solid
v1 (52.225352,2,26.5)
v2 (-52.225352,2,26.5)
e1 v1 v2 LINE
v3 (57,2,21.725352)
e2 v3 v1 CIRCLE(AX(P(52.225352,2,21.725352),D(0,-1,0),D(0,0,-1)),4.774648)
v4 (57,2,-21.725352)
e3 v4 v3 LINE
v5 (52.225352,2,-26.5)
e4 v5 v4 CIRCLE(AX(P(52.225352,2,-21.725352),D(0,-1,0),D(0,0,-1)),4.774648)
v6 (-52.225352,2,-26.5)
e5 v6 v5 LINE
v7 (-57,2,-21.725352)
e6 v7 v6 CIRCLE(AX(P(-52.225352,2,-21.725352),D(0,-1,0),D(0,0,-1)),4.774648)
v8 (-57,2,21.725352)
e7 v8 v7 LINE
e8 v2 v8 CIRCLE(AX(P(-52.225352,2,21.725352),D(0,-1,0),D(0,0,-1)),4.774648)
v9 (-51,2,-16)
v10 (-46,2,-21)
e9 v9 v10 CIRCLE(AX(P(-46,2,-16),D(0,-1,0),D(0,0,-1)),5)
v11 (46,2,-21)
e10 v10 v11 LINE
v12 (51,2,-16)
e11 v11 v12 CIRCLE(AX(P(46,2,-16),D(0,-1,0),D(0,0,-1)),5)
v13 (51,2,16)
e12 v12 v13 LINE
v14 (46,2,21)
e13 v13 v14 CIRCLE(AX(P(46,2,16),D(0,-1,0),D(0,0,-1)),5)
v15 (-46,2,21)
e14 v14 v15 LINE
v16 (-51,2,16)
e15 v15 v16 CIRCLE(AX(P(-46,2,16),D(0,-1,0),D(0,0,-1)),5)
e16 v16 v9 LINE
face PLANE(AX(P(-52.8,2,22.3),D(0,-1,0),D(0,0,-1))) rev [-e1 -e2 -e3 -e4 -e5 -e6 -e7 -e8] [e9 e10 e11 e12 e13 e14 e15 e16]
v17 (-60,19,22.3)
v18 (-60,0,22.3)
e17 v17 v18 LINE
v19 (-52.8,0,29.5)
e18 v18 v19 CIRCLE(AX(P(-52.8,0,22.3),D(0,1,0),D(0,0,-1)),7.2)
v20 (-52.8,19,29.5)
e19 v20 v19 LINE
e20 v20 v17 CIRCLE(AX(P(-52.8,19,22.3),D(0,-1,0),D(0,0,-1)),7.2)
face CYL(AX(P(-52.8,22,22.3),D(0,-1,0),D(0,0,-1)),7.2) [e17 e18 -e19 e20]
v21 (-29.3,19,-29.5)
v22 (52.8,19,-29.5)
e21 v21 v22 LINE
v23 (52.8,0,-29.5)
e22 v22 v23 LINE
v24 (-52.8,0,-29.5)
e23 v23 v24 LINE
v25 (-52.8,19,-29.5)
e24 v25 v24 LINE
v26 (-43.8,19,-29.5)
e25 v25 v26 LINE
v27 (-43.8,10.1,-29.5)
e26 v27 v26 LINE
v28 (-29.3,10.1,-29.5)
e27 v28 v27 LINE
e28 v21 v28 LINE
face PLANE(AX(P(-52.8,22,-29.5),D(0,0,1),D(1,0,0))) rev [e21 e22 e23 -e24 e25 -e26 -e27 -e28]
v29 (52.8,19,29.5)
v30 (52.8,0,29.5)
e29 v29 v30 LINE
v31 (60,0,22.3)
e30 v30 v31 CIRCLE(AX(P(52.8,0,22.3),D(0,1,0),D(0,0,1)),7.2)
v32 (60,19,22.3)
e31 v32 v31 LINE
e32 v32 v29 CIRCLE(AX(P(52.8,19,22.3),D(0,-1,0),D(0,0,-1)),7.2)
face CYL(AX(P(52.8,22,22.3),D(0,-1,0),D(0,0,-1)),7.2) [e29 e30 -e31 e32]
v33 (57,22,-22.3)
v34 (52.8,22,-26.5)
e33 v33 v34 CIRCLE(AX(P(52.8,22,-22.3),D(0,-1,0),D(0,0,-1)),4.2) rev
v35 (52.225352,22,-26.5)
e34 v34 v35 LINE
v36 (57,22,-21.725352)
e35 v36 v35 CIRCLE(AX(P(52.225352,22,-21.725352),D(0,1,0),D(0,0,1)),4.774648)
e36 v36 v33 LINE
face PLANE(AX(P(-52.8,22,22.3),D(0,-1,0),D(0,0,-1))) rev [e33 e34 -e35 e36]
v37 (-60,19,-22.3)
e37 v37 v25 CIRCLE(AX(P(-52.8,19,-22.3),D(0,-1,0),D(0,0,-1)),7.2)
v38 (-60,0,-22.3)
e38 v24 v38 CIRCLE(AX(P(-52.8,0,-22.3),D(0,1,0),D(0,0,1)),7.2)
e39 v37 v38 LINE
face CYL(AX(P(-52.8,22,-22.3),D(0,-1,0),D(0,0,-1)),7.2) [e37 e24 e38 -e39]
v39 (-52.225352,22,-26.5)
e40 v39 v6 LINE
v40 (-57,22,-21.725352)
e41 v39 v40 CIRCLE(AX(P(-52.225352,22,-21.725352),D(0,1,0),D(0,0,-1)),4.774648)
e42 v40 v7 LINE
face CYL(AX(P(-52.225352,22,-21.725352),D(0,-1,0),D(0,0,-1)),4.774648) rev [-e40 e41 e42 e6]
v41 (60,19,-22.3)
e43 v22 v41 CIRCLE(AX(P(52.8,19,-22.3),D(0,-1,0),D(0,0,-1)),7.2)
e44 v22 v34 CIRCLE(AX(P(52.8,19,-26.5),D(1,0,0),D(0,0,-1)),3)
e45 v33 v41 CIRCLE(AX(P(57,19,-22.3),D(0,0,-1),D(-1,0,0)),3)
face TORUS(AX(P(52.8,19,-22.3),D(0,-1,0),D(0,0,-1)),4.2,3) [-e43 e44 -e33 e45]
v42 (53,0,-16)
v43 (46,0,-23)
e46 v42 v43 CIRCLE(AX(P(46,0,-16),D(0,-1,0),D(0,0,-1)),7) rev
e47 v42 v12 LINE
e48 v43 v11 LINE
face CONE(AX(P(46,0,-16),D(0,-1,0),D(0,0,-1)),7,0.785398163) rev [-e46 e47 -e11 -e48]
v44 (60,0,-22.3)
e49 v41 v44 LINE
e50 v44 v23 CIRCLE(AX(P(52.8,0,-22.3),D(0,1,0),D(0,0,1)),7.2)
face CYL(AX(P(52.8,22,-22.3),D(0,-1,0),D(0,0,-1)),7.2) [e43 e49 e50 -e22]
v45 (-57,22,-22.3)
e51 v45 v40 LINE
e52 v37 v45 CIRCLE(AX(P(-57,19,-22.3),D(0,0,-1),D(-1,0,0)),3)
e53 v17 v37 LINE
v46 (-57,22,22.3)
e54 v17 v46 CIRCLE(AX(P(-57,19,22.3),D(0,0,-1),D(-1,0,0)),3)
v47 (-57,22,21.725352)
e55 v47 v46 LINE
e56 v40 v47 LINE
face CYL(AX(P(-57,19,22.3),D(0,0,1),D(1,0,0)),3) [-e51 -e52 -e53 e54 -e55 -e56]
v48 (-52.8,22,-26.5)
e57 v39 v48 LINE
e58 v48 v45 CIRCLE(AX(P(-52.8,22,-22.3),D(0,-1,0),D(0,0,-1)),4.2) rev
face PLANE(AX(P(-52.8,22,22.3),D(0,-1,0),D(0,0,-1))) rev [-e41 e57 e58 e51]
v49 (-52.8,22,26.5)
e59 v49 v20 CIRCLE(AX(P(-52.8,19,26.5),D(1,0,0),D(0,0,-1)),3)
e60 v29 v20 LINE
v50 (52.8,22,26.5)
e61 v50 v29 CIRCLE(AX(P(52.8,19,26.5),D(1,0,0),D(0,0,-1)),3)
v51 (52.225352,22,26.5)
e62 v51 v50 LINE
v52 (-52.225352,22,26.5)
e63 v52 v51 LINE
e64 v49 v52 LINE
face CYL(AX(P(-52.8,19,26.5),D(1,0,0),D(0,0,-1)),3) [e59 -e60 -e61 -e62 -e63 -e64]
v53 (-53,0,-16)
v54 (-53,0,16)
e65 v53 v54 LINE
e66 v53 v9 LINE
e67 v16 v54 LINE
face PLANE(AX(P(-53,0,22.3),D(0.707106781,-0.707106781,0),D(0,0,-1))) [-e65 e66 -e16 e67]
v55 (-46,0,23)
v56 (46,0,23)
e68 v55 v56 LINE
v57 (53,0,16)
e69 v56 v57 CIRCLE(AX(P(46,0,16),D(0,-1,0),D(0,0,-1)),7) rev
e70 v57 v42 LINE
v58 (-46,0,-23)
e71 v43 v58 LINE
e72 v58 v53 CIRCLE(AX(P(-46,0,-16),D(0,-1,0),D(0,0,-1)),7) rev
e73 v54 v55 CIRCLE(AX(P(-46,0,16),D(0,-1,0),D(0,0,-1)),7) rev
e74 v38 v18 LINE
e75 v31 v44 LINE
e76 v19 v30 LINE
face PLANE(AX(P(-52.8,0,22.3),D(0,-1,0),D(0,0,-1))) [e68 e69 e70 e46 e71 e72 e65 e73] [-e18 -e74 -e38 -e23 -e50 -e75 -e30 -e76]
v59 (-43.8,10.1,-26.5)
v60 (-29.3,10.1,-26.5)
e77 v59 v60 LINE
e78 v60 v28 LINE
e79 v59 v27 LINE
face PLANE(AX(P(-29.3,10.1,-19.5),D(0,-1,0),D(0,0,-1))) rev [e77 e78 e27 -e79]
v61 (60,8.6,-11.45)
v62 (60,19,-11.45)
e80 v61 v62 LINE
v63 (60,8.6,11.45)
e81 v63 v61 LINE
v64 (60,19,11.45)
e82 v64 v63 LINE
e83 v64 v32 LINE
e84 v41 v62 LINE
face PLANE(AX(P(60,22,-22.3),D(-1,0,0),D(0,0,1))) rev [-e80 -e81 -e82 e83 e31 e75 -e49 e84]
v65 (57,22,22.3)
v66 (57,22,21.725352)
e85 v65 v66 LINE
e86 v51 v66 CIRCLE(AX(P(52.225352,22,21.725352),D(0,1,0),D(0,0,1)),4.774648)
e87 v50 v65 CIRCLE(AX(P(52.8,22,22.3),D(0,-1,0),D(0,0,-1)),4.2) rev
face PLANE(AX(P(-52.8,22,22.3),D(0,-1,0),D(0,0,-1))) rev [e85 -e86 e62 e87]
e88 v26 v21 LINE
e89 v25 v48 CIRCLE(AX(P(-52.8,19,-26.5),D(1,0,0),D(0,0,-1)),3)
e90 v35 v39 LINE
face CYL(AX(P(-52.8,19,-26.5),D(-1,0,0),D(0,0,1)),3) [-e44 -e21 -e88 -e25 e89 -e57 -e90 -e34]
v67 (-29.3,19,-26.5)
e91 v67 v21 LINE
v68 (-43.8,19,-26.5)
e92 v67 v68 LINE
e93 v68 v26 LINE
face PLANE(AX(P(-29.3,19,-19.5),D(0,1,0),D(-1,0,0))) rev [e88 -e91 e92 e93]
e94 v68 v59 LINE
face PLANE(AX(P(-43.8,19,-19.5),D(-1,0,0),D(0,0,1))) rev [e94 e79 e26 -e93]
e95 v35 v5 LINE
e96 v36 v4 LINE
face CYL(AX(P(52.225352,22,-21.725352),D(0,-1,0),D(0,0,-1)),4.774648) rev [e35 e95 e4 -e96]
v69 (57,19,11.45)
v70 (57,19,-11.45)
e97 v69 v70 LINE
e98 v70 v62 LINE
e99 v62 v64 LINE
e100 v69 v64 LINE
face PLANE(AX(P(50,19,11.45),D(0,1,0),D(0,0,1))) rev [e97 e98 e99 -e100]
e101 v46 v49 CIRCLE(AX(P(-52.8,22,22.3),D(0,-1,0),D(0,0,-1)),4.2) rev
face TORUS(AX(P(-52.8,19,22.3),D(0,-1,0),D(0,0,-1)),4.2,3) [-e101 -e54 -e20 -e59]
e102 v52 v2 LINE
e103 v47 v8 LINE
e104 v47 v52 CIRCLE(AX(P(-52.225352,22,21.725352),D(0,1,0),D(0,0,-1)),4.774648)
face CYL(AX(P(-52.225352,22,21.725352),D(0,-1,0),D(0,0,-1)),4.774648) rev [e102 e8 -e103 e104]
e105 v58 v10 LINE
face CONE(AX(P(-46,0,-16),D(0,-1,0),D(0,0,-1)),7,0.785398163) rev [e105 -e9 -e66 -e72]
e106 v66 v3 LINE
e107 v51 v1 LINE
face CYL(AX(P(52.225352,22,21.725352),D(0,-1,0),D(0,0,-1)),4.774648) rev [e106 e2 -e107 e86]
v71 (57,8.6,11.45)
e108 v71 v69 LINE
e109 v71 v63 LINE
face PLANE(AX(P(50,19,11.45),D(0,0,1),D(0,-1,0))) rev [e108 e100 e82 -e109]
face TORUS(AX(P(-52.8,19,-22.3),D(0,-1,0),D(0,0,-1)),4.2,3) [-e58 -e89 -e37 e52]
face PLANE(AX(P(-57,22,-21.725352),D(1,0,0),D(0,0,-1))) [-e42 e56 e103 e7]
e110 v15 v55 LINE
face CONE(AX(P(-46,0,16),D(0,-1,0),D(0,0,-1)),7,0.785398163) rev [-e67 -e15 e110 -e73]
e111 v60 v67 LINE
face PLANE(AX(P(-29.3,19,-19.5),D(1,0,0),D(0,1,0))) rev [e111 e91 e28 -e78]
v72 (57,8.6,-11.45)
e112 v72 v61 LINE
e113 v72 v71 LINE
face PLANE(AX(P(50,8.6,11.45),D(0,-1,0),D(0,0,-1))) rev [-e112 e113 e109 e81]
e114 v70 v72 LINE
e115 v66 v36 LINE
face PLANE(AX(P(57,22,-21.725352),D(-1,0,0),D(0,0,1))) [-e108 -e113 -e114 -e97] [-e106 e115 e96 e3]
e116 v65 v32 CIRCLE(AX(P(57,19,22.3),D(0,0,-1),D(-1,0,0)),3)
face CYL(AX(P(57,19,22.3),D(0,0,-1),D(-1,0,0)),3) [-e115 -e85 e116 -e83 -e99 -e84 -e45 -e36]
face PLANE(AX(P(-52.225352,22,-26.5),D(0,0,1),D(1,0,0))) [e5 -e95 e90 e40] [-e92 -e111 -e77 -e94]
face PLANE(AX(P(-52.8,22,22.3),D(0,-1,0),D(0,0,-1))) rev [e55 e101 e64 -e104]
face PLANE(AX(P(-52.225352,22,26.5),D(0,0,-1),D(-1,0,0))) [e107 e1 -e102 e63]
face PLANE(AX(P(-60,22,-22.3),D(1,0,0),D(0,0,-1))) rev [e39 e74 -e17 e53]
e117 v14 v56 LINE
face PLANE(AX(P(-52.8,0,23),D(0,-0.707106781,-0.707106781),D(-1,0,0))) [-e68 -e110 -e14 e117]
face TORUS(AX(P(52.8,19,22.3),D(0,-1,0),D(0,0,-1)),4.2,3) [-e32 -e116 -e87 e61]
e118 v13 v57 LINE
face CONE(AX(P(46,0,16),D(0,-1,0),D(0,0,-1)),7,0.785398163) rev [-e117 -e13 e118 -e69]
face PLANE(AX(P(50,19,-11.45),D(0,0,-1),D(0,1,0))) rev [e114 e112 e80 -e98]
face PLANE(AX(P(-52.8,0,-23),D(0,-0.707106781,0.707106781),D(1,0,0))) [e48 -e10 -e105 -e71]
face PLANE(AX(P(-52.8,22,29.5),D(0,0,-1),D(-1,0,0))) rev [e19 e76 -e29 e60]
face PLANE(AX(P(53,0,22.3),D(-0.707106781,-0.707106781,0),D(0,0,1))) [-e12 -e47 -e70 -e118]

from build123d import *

# Parameters (mm, degrees)
SALIENTE_EXTRUIR2_DEPTH = 22
SALIENTE_EXTRUIR3_DEPTH = 2
CORTAR_EXTRUIR1_DEPTH   = 2
CHAFL_N1_SIZE           = 3
REDONDEO2_R             = 3
CROQUIS4_W              = 22.9
CROQUIS4_H              = 10.4
CORTAR_EXTRUIR2_DEPTH   = 10
CROQUIS5_W              = 14.5
CROQUIS5_H              = 8.9
CORTAR_EXTRUIR3_DEPTH   = 10


# Some blends are built 0.0001 mm under size
with BuildPart() as part:
    # Croquis1 → Saliente-Extruir2 (new body)
    with BuildSketch(Plane(origin=(0, 0, 0), x_dir=(1, 0, 0), z_dir=(0, 1, 0))):
        with BuildLine():
            Line((-52.8, 29.5), (52.8, 29.5))
            ThreePointArc((52.8, 29.5), (57.891168825, 27.391168825), (60, 22.3))
            Line((60, 22.3), (60, -22.3))
            ThreePointArc((60, -22.3), (57.891168825, -27.391168825), (52.8, -29.5))
            Line((52.8, -29.5), (-52.8, -29.5))
            ThreePointArc((-52.8, -29.5), (-57.891168825, -27.391168825), (-60, -22.3))
            Line((-60, -22.3), (-60, 22.3))
            ThreePointArc((-60, 22.3), (-57.891168825, 27.391168825), (-52.8, 29.5))
        make_face()
        with BuildLine():
            Line((-52.225351705, 26.5), (52.225351705, 26.5))
            ThreePointArc((52.225351705, 26.5), (55.601537892, 25.101537892), (57, 21.725351705))
            Line((57, 21.725351705), (57, -21.725351705))
            ThreePointArc((57, -21.725351705), (55.601537892, -25.101537892), (52.225351705, -26.5))
            Line((52.225351705, -26.5), (-52.225351705, -26.5))
            ThreePointArc((-52.225351705, -26.5), (-55.601537892, -25.101537892), (-57, -21.725351705))
            Line((-57, -21.725351705), (-57, 21.725351705))
            ThreePointArc((-57, 21.725351705), (-55.601537892, 25.101537892), (-52.225351705, 26.5))
        make_face(mode=Mode.SUBTRACT)
    extrude(amount=SALIENTE_EXTRUIR2_DEPTH)

    # Croquis2 → Saliente-Extruir3 (add)
    with BuildSketch(Plane.XZ):
        with BuildLine():
            Line((-60, 22.3), (-60, -22.3))
            ThreePointArc((-60, -22.3), (-57.891168825, -27.391168825), (-52.8, -29.5))
            Line((-52.8, -29.5), (52.8, -29.5))
            ThreePointArc((52.8, -29.5), (57.891168825, -27.391168825), (60, -22.3))
            Line((60, -22.3), (60, 22.3))
            ThreePointArc((60, 22.3), (57.891168825, 27.391168825), (52.8, 29.5))
            Line((52.8, 29.5), (-52.8, 29.5))
            ThreePointArc((-52.8, 29.5), (-57.891168825, 27.391168825), (-60, 22.3))
        make_face()
    extrude(amount=-SALIENTE_EXTRUIR3_DEPTH)

    # Croquis3 → Cortar-Extruir1 (cut)
    with BuildSketch(Plane(origin=(0, 2, 0), x_dir=(1, 0, 0), z_dir=(0, 1, 0))):
        with BuildLine():
            Line((-46, 20), (46, 20))
            ThreePointArc((46, 20), (48.828427125, 18.828427125), (50, 16))
            Line((50, 16), (50, -16))
            ThreePointArc((50, -16), (48.828427125, -18.828427125), (46, -20))
            Line((46, -20), (-46, -20))
            ThreePointArc((-46, -20), (-48.828427125, -18.828427125), (-50, -16))
            Line((-50, -16), (-50, 16))
            ThreePointArc((-50, 16), (-48.828427125, 18.828427125), (-46, 20))
        make_face()
    extrude(amount=-CORTAR_EXTRUIR1_DEPTH, mode=Mode.SUBTRACT)

    # Chaflán1
    # the kernel refuses this chamfer: 3 mm, written as the material it takes off along each edge
    with BuildSketch(Plane(origin=(-50, 0, 16), x_dir=(-0.9996219169112968, -0.02749587661058636, 0), z_dir=(0, 0, -1)), Plane(origin=(50, 0, -16), x_dir=(0.9996219169112968, -0.02749587661058636, 0), z_dir=(0, 0, 1))) as chafl_n1_piece_1:
        Polygon((CHAFL_N1_SIZE * 0.999621916911, CHAFL_N1_SIZE * 0.0274958766106), (-CHAFL_N1_SIZE * 0.0274958766106, CHAFL_N1_SIZE * 0.999621916911), (0, 0), align=None)
    extrude(amount=32, mode=Mode.SUBTRACT)
    with BuildSketch(Plane(origin=(-46, 0, 16), x_dir=(0, 0, 1), z_dir=(1, 0, 0))) as chafl_n1_piece_2:
        Polygon((4 + CHAFL_N1_SIZE, 0), (4, -CHAFL_N1_SIZE), (4, 0), align=None)
    revolve(axis=Axis((-46, 0, 16), (0, -1, 0)), revolution_arc=90, mode=Mode.SUBTRACT)
    with BuildSketch(Plane(origin=(-46, 0, -16), x_dir=(-1, 0, 0), z_dir=(0, 0, 1))) as chafl_n1_piece_3:
        Polygon((4 + CHAFL_N1_SIZE, 0), (4, -CHAFL_N1_SIZE), (4, 0), align=None)
    revolve(axis=Axis((-46, 0, -16), (0, -1, 0)), revolution_arc=90, mode=Mode.SUBTRACT)
    with BuildSketch(Plane(origin=(46, 0, 20), x_dir=(0, -0.02749587661058636, 0.9996219169112968), z_dir=(-1, 0, 0)), Plane(origin=(-46, 0, -20), x_dir=(0, -0.02749587661058636, -0.9996219169112968), z_dir=(1, 0, 0))) as chafl_n1_piece_4:
        Polygon((CHAFL_N1_SIZE * 0.999621916911, CHAFL_N1_SIZE * 0.0274958766106), (-CHAFL_N1_SIZE * 0.0274958766106, CHAFL_N1_SIZE * 0.999621916911), (0, 0), align=None)
    extrude(amount=92, mode=Mode.SUBTRACT)
    with BuildSketch(Plane(origin=(46, 0, 16), x_dir=(1, 0, 0), z_dir=(0, 0, -1))) as chafl_n1_piece_5:
        Polygon((4 + CHAFL_N1_SIZE, 0), (4, -CHAFL_N1_SIZE), (4, 0), align=None)
    revolve(axis=Axis((46, 0, 16), (0, -1, 0)), revolution_arc=90, mode=Mode.SUBTRACT)
    with BuildSketch(Plane(origin=(46, 0, -16), x_dir=(0, 0, -1), z_dir=(-1, 0, 0))) as chafl_n1_piece_6:
        Polygon((4 + CHAFL_N1_SIZE, 0), (4, -CHAFL_N1_SIZE), (4, 0), align=None)
    revolve(axis=Axis((46, 0, -16), (0, -1, 0)), revolution_arc=90, mode=Mode.SUBTRACT)

    # Redondeo2
    redondeo2_edges = [part.edges().sort_by_distance(p)[0] for p in [
        (57.891168825, 22, 27.391168825),
        (60, 22, 0),
        (57.891168825, 22, -27.391168825),
        (0, 22, -29.5),
        (-57.891168825, 22, -27.391168825),
        (-60, 22, 0),
        (-57.891168825, 22, 27.391168825),
        (0, 22, 29.5),
    ]]
    fillet(redondeo2_edges, radius=REDONDEO2_R - 0.0001)  # a hair under: the kernel refuses the full size

    # Croquis4 → Cortar-Extruir2 (cut)
    with BuildSketch(Plane(origin=(60, 0, 0), x_dir=(0, 0, -1), z_dir=(1, 0, 0))):
        with Locations((0, 13.8)):
            Rectangle(CROQUIS4_W, CROQUIS4_H)
    extrude(amount=-CORTAR_EXTRUIR2_DEPTH, mode=Mode.SUBTRACT)

    # Croquis5 → Cortar-Extruir3 (cut)
    with BuildSketch(Plane(origin=(0, 0, -29.5), x_dir=(-1, 0, 0), z_dir=(0, 0, -1))):
        with Locations((36.55, 14.55)):
            Rectangle(CROQUIS5_W, CROQUIS5_H)
    extrude(amount=-CORTAR_EXTRUIR3_DEPTH, mode=Mode.SUBTRACT)


solid = part.part
